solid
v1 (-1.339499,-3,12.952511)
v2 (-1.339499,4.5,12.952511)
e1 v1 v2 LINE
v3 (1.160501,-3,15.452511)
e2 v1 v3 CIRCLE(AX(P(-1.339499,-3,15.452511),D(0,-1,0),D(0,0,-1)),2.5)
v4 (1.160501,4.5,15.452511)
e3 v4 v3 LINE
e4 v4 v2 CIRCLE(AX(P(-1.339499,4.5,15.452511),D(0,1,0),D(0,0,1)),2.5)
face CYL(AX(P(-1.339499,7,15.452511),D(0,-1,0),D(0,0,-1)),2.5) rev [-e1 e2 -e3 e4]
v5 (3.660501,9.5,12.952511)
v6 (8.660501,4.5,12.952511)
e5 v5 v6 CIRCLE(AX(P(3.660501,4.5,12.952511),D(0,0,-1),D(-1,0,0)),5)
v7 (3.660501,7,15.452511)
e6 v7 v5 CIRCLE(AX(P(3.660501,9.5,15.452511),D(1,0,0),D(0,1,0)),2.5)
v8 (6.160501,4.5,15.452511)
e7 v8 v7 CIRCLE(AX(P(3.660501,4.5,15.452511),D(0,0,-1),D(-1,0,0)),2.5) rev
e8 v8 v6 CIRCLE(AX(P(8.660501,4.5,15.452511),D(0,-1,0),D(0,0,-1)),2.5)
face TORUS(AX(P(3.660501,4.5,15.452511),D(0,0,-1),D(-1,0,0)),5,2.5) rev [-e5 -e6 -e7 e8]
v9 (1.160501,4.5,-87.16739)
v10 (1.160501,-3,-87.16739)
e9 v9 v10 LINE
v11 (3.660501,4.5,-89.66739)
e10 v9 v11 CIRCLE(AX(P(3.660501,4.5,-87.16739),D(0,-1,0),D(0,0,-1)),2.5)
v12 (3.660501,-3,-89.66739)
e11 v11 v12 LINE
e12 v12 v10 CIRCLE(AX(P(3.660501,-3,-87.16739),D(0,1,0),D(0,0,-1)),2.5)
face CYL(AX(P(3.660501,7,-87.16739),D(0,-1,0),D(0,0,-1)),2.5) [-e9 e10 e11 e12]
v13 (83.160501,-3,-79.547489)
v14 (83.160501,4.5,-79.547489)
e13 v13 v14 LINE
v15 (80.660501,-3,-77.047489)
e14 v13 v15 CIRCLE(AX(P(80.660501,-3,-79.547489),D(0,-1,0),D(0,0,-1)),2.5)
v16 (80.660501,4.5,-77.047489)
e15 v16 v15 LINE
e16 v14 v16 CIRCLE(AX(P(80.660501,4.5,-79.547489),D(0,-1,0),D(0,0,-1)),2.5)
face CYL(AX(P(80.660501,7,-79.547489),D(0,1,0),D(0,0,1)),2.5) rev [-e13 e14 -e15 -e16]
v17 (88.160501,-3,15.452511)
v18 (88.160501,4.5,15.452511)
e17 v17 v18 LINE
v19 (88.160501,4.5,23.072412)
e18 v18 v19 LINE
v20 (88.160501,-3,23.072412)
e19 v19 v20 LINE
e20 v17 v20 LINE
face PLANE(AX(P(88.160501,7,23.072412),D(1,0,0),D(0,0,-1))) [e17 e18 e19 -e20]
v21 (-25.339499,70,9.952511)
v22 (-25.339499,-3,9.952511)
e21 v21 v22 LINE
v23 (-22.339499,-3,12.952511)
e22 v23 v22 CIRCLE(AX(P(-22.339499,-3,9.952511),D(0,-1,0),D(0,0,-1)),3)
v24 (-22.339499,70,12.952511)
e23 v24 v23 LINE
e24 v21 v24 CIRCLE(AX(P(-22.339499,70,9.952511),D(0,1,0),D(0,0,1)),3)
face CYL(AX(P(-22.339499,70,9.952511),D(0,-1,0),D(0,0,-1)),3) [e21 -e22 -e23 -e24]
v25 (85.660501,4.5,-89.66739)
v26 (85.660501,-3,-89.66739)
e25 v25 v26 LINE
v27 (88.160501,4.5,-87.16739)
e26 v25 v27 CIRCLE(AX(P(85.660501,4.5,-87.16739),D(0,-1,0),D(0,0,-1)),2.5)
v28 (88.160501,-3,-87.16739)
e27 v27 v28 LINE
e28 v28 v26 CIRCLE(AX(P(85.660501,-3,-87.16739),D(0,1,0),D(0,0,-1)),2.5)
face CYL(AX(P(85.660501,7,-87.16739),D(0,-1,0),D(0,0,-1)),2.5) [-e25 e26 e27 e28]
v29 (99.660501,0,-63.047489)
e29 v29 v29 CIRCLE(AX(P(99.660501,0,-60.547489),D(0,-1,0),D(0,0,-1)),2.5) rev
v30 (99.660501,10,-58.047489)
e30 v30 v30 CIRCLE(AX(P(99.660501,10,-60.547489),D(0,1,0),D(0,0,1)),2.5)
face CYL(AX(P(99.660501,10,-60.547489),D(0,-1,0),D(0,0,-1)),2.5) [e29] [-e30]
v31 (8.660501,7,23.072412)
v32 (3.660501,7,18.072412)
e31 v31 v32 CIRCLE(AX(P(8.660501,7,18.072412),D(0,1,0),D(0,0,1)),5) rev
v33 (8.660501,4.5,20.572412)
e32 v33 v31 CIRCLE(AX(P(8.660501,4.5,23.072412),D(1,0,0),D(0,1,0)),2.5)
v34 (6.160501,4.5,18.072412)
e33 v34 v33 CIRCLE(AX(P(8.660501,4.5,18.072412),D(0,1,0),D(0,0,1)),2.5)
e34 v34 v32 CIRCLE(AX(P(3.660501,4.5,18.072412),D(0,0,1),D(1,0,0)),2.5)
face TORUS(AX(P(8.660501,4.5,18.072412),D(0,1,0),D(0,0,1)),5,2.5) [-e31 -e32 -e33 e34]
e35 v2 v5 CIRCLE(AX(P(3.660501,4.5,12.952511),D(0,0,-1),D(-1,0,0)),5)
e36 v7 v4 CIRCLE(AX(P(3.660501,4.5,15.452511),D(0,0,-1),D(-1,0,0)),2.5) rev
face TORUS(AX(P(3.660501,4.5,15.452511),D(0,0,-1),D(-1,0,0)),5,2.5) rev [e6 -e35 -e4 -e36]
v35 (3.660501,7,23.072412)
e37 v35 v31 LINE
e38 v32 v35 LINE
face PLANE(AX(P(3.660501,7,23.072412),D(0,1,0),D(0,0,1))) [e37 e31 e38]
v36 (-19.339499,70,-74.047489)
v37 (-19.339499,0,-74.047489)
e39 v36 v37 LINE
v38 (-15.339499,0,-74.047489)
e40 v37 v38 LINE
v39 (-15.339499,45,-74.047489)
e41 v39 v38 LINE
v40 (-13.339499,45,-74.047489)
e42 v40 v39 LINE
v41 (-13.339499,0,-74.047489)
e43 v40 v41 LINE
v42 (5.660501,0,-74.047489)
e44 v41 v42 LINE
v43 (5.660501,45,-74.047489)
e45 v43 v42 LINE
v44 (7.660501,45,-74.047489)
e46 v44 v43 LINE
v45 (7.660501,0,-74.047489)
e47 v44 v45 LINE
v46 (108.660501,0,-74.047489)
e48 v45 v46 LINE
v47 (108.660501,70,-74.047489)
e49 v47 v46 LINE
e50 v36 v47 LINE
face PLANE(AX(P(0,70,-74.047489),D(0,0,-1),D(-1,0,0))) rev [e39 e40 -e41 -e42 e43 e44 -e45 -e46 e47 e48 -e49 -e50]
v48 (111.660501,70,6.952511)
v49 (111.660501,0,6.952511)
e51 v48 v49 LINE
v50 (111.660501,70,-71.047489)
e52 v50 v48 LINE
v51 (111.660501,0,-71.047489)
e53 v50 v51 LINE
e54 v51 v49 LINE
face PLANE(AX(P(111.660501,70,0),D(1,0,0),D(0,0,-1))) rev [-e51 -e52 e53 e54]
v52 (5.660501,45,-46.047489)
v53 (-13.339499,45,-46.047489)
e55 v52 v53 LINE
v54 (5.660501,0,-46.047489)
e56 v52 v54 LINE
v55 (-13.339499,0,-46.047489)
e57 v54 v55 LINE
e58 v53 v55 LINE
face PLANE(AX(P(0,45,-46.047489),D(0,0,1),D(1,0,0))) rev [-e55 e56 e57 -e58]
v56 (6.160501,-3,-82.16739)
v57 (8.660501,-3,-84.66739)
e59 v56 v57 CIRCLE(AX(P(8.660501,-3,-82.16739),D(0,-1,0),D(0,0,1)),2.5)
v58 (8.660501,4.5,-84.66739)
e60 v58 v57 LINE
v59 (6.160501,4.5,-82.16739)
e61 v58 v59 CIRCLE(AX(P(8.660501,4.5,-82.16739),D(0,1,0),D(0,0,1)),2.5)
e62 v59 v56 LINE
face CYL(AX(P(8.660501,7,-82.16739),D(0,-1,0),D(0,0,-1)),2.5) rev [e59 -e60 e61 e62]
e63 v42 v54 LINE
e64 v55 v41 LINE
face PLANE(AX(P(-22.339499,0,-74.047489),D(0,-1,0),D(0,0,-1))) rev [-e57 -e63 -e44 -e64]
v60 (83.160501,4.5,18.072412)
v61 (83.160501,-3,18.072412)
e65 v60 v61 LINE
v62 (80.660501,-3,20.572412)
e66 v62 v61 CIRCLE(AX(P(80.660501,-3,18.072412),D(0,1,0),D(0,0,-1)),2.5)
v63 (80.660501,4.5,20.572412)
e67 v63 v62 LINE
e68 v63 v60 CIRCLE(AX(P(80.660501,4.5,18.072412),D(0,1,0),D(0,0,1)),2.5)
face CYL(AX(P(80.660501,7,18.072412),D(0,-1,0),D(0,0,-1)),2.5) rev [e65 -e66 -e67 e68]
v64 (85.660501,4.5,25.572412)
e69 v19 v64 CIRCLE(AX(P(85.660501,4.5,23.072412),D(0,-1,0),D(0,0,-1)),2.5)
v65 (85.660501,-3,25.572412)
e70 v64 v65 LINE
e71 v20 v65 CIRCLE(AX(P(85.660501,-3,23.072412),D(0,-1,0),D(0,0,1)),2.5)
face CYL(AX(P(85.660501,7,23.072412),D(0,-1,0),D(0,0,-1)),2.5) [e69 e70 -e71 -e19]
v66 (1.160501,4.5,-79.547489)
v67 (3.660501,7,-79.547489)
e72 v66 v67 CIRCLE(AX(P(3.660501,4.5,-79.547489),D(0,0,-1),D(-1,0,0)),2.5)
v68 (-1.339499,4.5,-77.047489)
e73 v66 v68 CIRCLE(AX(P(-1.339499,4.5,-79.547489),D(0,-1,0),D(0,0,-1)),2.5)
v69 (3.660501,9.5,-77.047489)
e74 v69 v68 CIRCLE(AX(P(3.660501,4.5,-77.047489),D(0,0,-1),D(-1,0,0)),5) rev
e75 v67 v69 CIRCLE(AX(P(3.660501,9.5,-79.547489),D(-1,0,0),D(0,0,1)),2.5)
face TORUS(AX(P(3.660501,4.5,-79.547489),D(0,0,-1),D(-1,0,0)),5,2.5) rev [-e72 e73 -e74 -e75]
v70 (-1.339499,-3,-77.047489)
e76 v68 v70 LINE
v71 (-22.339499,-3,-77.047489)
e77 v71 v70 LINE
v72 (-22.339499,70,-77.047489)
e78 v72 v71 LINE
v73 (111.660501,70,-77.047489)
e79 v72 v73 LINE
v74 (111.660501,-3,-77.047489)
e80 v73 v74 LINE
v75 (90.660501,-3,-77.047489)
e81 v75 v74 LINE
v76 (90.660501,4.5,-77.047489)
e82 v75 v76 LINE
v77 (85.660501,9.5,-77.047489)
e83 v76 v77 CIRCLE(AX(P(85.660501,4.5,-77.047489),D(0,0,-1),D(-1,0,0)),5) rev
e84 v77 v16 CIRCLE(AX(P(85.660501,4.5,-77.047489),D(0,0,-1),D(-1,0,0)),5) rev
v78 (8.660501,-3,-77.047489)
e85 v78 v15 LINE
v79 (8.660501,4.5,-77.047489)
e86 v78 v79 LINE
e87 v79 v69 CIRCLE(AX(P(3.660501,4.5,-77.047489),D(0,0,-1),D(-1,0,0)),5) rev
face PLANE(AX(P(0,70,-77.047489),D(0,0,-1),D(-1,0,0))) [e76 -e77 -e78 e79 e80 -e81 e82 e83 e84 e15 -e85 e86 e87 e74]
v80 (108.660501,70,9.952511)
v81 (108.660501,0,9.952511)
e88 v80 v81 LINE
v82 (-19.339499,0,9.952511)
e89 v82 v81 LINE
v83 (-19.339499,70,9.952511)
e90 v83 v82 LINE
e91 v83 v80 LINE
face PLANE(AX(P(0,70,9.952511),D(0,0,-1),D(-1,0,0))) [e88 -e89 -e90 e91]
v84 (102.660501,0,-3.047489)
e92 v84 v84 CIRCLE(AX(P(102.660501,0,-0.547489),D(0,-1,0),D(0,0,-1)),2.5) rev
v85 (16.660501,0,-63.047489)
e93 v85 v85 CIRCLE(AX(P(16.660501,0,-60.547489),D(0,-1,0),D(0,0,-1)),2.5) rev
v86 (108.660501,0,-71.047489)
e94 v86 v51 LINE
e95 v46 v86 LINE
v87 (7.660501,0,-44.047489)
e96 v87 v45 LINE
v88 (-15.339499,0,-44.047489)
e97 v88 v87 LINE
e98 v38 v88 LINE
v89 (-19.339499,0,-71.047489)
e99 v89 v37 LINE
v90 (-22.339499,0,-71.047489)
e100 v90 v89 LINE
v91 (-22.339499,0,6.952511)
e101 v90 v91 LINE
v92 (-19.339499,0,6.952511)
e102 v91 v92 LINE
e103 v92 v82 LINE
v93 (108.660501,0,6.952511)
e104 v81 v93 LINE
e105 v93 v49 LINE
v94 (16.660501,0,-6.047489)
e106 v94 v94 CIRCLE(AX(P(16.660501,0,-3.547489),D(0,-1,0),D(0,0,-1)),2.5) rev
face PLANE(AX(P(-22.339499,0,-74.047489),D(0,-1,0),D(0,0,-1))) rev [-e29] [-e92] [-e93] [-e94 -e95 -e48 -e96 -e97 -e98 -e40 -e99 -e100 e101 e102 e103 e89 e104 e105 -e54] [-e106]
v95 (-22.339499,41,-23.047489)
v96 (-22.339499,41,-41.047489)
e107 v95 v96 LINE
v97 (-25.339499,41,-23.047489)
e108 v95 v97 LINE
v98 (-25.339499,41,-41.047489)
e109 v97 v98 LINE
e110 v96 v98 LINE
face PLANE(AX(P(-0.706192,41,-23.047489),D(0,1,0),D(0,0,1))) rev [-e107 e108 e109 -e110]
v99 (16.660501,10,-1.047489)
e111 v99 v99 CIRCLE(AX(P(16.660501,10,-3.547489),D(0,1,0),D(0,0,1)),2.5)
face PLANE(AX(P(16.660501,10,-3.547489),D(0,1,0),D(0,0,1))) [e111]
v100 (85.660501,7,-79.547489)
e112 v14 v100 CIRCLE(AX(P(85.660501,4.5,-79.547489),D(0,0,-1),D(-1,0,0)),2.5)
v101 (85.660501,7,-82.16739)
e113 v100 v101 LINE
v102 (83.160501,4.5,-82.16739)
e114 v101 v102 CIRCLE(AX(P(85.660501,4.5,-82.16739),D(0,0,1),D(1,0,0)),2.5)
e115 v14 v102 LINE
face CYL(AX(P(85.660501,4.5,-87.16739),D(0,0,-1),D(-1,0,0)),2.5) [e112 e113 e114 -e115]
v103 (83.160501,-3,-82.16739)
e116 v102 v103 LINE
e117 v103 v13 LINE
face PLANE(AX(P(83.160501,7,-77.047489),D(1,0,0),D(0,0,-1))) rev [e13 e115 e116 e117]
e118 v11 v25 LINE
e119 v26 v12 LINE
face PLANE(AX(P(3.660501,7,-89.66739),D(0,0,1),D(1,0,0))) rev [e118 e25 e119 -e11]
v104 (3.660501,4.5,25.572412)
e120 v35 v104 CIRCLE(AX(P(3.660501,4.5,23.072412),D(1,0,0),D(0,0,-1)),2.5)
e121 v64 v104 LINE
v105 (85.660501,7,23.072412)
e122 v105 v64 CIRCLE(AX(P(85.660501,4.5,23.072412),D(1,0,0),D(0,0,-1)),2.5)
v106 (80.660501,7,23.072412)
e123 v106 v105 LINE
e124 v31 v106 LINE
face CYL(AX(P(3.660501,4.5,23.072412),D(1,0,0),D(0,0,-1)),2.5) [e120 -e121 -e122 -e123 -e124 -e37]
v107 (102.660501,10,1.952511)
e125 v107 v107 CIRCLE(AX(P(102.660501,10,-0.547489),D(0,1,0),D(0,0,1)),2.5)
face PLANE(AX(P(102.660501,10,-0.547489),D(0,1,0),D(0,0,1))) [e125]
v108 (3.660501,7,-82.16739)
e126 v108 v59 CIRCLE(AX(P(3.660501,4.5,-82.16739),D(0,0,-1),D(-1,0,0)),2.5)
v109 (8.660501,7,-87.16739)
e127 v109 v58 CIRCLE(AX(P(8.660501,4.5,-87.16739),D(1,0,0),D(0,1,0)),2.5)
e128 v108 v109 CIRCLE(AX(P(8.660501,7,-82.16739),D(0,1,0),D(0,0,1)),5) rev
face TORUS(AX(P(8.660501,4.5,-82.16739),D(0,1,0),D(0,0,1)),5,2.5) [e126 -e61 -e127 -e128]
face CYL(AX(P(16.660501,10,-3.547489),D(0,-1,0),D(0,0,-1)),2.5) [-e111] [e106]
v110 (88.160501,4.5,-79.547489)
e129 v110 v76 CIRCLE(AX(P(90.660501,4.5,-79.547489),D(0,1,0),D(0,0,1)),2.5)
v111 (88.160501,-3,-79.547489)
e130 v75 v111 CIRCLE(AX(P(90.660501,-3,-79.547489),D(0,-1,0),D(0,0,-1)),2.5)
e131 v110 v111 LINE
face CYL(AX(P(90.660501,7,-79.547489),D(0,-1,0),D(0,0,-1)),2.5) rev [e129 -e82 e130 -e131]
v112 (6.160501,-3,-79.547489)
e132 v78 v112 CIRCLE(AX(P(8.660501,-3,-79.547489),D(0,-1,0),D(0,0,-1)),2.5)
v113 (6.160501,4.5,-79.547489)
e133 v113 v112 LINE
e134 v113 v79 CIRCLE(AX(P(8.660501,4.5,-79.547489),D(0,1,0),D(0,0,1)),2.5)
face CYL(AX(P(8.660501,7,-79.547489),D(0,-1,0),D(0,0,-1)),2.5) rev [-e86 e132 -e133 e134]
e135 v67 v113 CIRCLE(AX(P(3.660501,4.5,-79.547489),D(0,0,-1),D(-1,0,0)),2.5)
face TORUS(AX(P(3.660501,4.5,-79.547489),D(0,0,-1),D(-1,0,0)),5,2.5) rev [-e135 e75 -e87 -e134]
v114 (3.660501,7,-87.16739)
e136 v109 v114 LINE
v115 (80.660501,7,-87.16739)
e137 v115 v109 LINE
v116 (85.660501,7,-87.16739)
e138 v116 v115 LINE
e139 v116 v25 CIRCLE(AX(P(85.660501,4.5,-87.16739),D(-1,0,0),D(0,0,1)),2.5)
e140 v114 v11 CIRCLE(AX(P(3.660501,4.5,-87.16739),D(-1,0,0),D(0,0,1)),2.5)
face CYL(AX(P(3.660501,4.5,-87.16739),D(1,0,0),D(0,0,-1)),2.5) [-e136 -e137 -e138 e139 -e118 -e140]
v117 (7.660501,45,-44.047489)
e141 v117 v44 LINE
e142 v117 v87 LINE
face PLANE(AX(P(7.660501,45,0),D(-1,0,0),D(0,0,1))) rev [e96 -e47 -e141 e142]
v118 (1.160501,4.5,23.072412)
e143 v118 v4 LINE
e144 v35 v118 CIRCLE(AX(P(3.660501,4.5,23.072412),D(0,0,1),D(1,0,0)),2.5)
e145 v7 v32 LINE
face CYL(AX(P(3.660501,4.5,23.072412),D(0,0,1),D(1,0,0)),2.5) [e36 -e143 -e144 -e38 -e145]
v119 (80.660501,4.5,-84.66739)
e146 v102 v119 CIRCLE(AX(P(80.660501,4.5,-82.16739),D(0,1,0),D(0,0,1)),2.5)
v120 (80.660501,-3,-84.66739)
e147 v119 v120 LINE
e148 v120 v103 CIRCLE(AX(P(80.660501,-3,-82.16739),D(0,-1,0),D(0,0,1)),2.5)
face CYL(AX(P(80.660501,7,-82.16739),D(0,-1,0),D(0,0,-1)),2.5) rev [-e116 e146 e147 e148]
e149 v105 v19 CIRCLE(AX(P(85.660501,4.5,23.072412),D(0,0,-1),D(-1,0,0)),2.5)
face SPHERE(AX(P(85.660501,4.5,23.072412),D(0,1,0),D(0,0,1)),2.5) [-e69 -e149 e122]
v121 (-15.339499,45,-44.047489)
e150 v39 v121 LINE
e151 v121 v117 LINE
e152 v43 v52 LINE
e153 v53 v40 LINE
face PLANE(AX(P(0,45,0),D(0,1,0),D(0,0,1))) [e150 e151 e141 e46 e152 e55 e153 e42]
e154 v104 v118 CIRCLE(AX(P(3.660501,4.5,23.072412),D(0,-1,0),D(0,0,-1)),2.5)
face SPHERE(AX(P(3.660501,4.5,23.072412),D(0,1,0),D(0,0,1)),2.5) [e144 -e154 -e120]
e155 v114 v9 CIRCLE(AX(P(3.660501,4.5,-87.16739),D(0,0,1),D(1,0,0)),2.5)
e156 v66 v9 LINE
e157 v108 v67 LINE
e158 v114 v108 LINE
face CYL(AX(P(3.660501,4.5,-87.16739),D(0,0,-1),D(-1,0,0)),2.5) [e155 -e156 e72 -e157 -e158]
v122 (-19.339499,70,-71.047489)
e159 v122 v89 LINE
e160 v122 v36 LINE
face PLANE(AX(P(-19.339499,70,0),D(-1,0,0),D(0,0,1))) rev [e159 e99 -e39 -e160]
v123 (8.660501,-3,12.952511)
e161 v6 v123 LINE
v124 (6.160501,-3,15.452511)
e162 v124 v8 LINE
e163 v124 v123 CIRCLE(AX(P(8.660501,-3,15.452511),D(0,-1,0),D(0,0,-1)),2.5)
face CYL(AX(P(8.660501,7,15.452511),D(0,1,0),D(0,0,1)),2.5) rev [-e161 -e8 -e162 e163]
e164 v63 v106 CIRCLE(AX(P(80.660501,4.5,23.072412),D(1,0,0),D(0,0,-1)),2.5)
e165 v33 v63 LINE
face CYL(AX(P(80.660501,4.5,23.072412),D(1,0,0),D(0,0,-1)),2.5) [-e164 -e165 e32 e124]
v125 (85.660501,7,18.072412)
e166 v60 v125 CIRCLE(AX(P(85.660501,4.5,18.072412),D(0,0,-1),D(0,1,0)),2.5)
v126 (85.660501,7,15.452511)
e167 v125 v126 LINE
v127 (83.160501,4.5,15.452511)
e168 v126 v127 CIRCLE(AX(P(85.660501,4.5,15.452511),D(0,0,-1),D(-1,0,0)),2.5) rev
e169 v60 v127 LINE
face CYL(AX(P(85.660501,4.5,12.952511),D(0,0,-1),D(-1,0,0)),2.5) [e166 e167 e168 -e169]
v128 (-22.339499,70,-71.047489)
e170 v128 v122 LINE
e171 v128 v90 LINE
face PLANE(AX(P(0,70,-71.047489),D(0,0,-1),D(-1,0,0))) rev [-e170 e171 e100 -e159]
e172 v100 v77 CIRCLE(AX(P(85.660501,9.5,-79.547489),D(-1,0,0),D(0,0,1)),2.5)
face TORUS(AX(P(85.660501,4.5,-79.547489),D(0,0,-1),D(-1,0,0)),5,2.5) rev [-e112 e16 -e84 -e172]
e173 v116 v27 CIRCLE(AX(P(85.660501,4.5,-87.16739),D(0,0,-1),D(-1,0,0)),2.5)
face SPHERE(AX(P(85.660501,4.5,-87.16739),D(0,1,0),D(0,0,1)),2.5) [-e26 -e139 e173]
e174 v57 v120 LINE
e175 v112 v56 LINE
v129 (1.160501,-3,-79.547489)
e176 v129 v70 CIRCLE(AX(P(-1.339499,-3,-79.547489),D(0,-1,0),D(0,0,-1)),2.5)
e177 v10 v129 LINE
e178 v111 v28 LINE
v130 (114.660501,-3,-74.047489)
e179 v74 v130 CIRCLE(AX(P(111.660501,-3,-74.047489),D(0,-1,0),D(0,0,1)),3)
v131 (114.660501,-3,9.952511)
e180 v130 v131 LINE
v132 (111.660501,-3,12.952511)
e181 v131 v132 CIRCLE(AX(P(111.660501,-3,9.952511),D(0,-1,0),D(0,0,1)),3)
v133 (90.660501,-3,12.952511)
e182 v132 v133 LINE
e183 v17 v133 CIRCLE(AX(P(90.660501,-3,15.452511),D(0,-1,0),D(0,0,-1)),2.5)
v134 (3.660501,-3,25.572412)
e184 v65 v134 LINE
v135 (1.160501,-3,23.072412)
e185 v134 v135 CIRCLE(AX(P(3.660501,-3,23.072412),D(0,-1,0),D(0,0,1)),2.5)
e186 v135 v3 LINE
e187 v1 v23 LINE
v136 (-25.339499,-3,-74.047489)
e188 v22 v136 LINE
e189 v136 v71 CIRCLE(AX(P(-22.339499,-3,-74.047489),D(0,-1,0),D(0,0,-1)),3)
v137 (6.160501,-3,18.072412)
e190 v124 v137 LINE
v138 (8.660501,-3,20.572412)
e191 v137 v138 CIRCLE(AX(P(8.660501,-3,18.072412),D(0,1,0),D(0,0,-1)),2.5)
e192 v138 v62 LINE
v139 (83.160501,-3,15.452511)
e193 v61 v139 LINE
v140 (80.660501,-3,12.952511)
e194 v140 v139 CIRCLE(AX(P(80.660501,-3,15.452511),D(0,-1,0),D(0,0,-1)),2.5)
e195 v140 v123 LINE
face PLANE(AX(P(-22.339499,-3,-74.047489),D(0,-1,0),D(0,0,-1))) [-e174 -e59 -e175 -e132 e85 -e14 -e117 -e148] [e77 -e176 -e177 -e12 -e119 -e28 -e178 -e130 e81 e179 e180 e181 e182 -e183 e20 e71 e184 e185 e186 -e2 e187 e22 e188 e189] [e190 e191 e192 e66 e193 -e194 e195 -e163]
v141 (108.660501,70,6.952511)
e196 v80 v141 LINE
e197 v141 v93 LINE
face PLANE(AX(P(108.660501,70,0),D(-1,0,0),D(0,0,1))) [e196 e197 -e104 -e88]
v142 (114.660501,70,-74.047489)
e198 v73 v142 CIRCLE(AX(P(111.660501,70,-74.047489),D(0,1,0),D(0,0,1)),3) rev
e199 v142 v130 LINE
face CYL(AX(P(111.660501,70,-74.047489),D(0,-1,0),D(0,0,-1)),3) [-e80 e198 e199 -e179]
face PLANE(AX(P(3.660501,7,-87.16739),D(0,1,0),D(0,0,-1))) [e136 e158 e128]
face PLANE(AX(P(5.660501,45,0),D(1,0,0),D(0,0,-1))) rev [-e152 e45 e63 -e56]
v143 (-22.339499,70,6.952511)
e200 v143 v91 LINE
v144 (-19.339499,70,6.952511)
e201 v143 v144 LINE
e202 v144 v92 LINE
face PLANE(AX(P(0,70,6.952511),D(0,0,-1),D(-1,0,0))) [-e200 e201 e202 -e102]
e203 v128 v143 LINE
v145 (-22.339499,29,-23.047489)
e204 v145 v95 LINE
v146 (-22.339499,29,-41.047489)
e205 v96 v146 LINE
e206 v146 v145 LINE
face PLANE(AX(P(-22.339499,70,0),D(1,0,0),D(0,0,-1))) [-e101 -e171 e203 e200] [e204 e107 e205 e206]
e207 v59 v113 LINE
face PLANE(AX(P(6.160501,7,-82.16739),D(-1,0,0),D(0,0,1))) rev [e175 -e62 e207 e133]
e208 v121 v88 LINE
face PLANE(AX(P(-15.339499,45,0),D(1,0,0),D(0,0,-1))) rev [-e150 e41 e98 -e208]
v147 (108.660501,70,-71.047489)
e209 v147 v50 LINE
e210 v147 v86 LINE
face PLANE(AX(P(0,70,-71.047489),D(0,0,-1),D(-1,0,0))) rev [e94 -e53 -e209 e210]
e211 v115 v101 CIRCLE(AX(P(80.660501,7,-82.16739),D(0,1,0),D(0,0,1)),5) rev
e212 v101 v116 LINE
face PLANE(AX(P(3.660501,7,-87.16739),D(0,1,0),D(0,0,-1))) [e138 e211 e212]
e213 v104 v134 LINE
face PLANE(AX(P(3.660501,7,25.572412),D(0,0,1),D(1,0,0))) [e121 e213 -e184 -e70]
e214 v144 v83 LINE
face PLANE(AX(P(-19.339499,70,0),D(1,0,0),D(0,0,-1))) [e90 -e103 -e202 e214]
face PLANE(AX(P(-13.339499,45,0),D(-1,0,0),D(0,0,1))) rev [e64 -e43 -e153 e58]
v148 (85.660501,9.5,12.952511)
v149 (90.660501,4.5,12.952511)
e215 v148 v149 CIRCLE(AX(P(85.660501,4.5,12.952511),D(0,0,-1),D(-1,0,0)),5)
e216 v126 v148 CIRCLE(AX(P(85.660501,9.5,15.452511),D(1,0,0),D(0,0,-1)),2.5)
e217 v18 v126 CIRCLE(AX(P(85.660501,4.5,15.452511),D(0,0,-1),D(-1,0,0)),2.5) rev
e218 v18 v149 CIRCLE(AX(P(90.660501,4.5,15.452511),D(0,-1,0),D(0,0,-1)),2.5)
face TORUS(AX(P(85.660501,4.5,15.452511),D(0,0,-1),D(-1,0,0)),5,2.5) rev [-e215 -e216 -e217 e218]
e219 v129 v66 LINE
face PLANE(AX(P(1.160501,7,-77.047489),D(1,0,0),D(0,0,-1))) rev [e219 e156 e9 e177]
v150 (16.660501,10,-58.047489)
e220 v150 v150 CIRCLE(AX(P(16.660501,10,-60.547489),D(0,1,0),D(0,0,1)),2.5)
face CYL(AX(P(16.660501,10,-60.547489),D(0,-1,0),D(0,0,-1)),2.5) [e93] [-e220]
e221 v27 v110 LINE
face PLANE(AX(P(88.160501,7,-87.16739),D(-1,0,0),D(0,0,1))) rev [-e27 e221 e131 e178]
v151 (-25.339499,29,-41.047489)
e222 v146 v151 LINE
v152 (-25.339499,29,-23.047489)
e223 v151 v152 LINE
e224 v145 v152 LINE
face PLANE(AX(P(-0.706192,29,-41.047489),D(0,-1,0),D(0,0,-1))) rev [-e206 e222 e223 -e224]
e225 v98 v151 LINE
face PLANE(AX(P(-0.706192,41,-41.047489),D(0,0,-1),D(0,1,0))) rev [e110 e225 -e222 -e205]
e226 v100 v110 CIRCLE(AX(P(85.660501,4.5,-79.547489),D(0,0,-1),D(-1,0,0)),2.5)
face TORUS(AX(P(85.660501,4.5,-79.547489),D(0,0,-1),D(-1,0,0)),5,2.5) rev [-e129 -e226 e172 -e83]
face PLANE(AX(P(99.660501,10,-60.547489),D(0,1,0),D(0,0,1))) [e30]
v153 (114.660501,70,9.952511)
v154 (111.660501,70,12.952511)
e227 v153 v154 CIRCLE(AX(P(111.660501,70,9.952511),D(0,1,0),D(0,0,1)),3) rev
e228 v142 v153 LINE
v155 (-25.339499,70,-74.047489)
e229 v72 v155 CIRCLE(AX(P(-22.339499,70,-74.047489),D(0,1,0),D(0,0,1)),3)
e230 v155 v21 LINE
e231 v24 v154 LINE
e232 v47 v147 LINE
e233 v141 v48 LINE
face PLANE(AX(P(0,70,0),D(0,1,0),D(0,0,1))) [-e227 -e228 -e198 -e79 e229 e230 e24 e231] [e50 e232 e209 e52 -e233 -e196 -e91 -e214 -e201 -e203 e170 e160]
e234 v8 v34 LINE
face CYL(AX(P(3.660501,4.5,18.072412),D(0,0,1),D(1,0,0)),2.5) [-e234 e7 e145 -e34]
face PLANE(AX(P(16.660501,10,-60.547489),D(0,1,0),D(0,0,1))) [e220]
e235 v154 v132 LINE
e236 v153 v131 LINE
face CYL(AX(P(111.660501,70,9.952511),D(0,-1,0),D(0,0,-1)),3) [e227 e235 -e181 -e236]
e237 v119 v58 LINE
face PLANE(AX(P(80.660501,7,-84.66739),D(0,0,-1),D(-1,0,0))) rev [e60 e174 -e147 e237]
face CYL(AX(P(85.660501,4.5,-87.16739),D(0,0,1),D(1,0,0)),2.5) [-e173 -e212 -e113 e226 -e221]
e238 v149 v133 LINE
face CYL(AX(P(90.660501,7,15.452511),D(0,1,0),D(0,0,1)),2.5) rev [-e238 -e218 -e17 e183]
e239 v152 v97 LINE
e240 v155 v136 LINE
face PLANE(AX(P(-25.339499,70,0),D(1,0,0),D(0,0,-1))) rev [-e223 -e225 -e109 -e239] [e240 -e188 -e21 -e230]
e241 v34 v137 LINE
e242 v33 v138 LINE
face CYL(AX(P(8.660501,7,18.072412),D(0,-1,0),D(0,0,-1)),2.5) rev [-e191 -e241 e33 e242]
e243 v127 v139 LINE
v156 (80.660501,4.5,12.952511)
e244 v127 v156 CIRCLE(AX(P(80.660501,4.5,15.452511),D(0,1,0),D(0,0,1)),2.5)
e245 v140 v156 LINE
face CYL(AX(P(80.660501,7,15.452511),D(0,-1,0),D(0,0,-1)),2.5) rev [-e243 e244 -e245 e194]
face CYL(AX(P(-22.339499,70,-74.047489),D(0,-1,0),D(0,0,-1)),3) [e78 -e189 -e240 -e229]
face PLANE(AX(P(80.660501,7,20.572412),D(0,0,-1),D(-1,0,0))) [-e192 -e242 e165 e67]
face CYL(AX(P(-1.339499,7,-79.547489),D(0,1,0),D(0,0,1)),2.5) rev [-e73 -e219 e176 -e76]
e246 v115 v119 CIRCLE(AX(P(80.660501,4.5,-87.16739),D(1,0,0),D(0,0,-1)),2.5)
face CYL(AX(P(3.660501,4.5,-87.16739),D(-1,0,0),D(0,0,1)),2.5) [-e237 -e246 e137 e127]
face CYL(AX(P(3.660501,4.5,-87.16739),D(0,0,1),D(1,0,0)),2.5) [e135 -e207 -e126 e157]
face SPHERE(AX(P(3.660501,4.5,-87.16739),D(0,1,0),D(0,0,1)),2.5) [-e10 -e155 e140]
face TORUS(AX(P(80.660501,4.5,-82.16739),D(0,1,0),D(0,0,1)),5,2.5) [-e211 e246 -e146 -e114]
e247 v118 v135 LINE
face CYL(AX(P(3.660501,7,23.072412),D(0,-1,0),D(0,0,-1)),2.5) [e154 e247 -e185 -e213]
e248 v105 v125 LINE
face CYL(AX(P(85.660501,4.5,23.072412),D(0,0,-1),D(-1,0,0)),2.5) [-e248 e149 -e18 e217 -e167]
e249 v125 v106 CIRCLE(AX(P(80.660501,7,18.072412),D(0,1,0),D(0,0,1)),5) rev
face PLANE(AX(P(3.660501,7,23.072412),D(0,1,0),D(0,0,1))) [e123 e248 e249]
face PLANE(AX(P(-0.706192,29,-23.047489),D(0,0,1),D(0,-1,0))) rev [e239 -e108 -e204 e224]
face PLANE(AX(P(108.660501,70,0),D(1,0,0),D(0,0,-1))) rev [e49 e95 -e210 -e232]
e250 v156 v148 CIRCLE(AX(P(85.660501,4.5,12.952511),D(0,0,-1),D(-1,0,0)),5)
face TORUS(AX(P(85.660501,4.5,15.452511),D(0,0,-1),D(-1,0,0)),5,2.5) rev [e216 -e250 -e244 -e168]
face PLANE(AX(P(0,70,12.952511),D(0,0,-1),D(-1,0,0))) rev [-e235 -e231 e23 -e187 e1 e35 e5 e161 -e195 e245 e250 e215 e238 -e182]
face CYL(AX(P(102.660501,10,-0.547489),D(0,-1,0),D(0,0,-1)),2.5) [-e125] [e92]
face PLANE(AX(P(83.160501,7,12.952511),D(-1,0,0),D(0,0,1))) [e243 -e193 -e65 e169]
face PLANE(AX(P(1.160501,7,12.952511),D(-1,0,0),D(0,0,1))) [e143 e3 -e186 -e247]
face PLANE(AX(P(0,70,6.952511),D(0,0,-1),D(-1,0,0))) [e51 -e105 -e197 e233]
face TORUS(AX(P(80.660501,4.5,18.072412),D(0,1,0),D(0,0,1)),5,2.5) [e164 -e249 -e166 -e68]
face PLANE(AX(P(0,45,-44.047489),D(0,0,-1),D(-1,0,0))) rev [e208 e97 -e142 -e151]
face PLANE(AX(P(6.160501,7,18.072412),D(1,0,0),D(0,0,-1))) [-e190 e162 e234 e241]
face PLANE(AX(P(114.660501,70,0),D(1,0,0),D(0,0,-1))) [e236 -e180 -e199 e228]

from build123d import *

# Parameters (mm, degrees)
CORPO_CENTRALE_DEPTH = 70
SCHIZZO13_W          = 18
SCHIZZO13_H          = 12
ON_OFF_DEPTH         = 3
FONDO_START          = 3
FONDO_DEPTH          = 3
MANIGLIA_1_DEPTH     = 10
RACCORDO55_R         = 2.5
RACCORDO56_R         = 2.5
RACCORDO57_R         = 2.5
RACCORDO58_R         = 2.5
RACCORDO62_R         = 2.5
RACCORDO63_R         = 2.5
RACCORDO64_R         = 2.5
RACCORDO65_R         = 2.5
SCHIZZO25_R          = 2.5
ATTACCO_PCB_DEPTH    = 10
CASE_BATTERIA_DEPTH  = 45


with BuildPart() as part:
    # Schizzo2 → Corpo centrale (new body)
    with BuildSketch(Plane(origin=(0, 0, 0), x_dir=(1, 0, 0), z_dir=(0, 1, 0))):
        with BuildLine():
            Line((-22.339499477, 77.047489197), (111.660500523, 77.047489197))
            ThreePointArc((111.660500523, 77.047489197), (113.781820867, 76.168809541), (114.660500523, 74.047489197))
            Line((114.660500523, 74.047489197), (114.660500523, -9.952510803))
            ThreePointArc((114.660500523, -9.952510803), (113.781820867, -12.073831146), (111.660500523, -12.952510803))
            Line((111.660500523, -12.952510803), (-22.339499477, -12.952510803))
            ThreePointArc((-22.339499477, -12.952510803), (-24.460819821, -12.073831146), (-25.339499477, -9.952510803))
            Line((-25.339499477, -9.952510803), (-25.339499477, 74.047489197))
            ThreePointArc((-25.339499477, 74.047489197), (-24.460819821, 76.168809541), (-22.339499477, 77.047489197))
        make_face()
        Polygon((-22.339499477, 71.047489197), (-19.339499477, 71.047489197), (-19.339499477, 74.047489197), (108.660500523, 74.047489197), (108.660500523, 71.047489197), (111.660500523, 71.047489197), (111.660500523, -6.952510803), (108.660500523, -6.952510803), (108.660500523, -9.952510803), (-19.339499477, -9.952510803), (-19.339499477, -6.952510803), (-22.339499477, -6.952510803), align=None, mode=Mode.SUBTRACT)
    extrude(amount=CORPO_CENTRALE_DEPTH)

    # Schizzo13 → On/off (cut)
    with BuildSketch(Plane.ZY.offset(25.339499477)):
        with Locations((-32.047489197, 35)):
            Rectangle(SCHIZZO13_W, SCHIZZO13_H)
    extrude(amount=-ON_OFF_DEPTH, mode=Mode.SUBTRACT)

    # Schizzo18 → Fondo (add)
    with BuildSketch(Plane.XZ.offset(FONDO_START)):
        with BuildLine():
            Line((-25.339499477, 9.952510803), (-25.339499477, -74.047489197))
            ThreePointArc((-25.339499477, -74.047489197), (-24.460819821, -76.168809541), (-22.339499477, -77.047489197))
            Line((-22.339499477, -77.047489197), (111.660500523, -77.047489197))
            ThreePointArc((111.660500523, -77.047489197), (113.781820867, -76.168809541), (114.660500523, -74.047489197))
            Line((114.660500523, -74.047489197), (114.660500523, 9.952510803))
            ThreePointArc((114.660500523, 9.952510803), (113.781820867, 12.073831146), (111.660500523, 12.952510803))
            Line((111.660500523, 12.952510803), (-22.339499477, 12.952510803))
            ThreePointArc((-22.339499477, 12.952510803), (-24.460819821, 12.073831146), (-25.339499477, 9.952510803))
        make_face()
    extrude(amount=-FONDO_DEPTH)

    # Schizzo23 → Maniglia 1 (add)
    with BuildSketch(Plane.XZ.offset(3)):
        with BuildLine():
            Line((1.160500523, 12.952510803), (1.160500523, 23.072411806))
            ThreePointArc((1.160500523, 23.072411806), (1.89273357, 24.840178759), (3.660500523, 25.572411806))
            Line((3.660500523, 25.572411806), (85.660500523, 25.572411806))
            ThreePointArc((85.660500523, 25.572411806), (87.428267476, 24.840178759), (88.160500523, 23.072411806))
            Line((88.160500523, 23.072411806), (88.160500523, 12.952510803))
            Line((88.160500523, 12.952510803), (83.160500523, 12.952510803))
            Line((83.160500523, 12.952510803), (83.160500523, 18.072411806))
            ThreePointArc((83.160500523, 18.072411806), (82.428267476, 19.840178759), (80.660500523, 20.572411806))
            Line((80.660500523, 20.572411806), (8.660500523, 20.572411806))
            ThreePointArc((8.660500523, 20.572411806), (6.89273357, 19.840178759), (6.160500523, 18.072411806))
            Line((6.160500523, 18.072411806), (6.160500523, 12.952510803))
            Line((6.160500523, 12.952510803), (1.160500523, 12.952510803))
        make_face()
    maniglia_1 = extrude(amount=-MANIGLIA_1_DEPTH)

    # Maniglia 2: Maniglia 1 across plane
    add(maniglia_1.mirror(Plane.XY.offset(-32.047489197)))

    # Raccordo55
    raccordo55_edges = [part.edges().sort_by_distance(p)[0] for p in [
        (1.160500523, 7, 18.012461305),
        (1.89273357, 7, 24.840178759),
        (44.660500523, 7, 25.572411806),
        (87.428267476, 7, 24.840178759),
        (88.160500523, 7, 18.012461305),
    ]]
    fillet(raccordo55_edges, radius=RACCORDO55_R)

    # Raccordo56
    raccordo56_edges = [part.edges().sort_by_distance(p)[0] for p in [
        (82.428267476, 7, 19.840178759),
        (83.160500523, 7, 15.512461305),
        (44.660500523, 7, 20.572411806),
        (6.89273357, 7, 19.840178759),
        (6.160500523, 7, 15.512461305),
    ]]
    fillet(raccordo56_edges, radius=RACCORDO56_R - 0.0001)  # a hair under: the kernel refuses the full size

    # Raccordo57
    raccordo57_edges = [part.edges().sort_by_distance(p)[0] for p in [
        (1.160500523, 0.75, 12.952510803),
        (1.89273357, 6.267766953, 12.952510803),
        (6.160500523, 0.75005, 12.952510803),
        (5.428296765, 6.267796242, 12.952510803),
    ]]
    fillet(raccordo57_edges, radius=RACCORDO57_R)

    # Raccordo58
    raccordo58_edges = [part.edges().sort_by_distance(p)[0] for p in [
        (88.160500523, 0.75, 12.952510803),
        (87.428267476, 6.267766953, 12.952510803),
        (83.160500523, 0.75005, 12.952510803),
        (83.892704281, 6.267796242, 12.952510803),
    ]]
    fillet(raccordo58_edges, radius=RACCORDO58_R)

    # Raccordo62
    raccordo62_edges = [part.edges().sort_by_distance(p)[0] for p in [
        (88.160500523, 7, -82.107439699),
        (87.428267476, 7, -88.935157154),
        (44.660500523, 7, -89.667390201),
        (1.89273357, 7, -88.935157154),
        (1.160500523, 7, -82.107439699),
    ]]
    fillet(raccordo62_edges, radius=RACCORDO62_R)

    # Raccordo63
    raccordo63_edges = [part.edges().sort_by_distance(p)[0] for p in [
        (82.428267476, 7, -83.935157154),
        (6.160500523, 7, -79.607439699),
        (6.89273357, 7, -83.935157154),
        (44.660500523, 7, -84.667390201),
        (83.160500523, 7, -79.607439699),
    ]]
    fillet(raccordo63_edges, radius=RACCORDO63_R - 0.0001)  # a hair under: the kernel refuses the full size

    # Raccordo64
    raccordo64_edges = [part.edges().sort_by_distance(p)[0] for p in [
        (88.160500523, 0.75, -77.047489197),
        (87.428267476, 6.267766953, -77.047489197),
        (83.160500523, 0.75005, -77.047489197),
        (83.892704281, 6.267796242, -77.047489197),
    ]]
    fillet(raccordo64_edges, radius=RACCORDO64_R)

    # Raccordo65
    raccordo65_edges = [part.edges().sort_by_distance(p)[0] for p in [
        (1.160500523, 0.75, -77.047489197),
        (1.89273357, 6.267766953, -77.047489197),
        (6.160500523, 0.75005, -77.047489197),
        (5.428296765, 6.267796242, -77.047489197),
    ]]
    fillet(raccordo65_edges, radius=RACCORDO65_R)

    # Schizzo25 → Attacco PCB (add)
    with BuildSketch(Plane(origin=(0, 0, 0), x_dir=(1, 0, 0), z_dir=(0, 1, 0))):
        with Locations(Location((99.660500523, 60.547489197, 0), (0, 0, 90))):
            Circle(SCHIZZO25_R)
        with Locations(Location((102.660500523, 0.547489197, 0), (0, 0, 90))):
            Circle(SCHIZZO25_R)
        with Locations(Location((16.660500523, 3.547489197, 0), (0, 0, 90))):
            Circle(SCHIZZO25_R)
        with Locations(Location((16.660500523, 60.547489197, 0), (0, 0, 90))):
            Circle(SCHIZZO25_R)
    extrude(amount=ATTACCO_PCB_DEPTH)

    # Schizzo26 → Case Batteria (add)
    with BuildSketch(Plane(origin=(0, 0, 0), x_dir=(1, 0, 0), z_dir=(0, 1, 0))):
        Polygon((-13.339499477, 74.047489197), (-15.339499477, 74.047489197), (-15.339499477, 44.047489197), (7.660500523, 44.047489197), (7.660500523, 74.047489197), (5.660500523, 74.047489197), (5.660500523, 46.047489197), (-13.339499477, 46.047489197), align=None)
    extrude(amount=CASE_BATTERIA_DEPTH)


solid = part.part
